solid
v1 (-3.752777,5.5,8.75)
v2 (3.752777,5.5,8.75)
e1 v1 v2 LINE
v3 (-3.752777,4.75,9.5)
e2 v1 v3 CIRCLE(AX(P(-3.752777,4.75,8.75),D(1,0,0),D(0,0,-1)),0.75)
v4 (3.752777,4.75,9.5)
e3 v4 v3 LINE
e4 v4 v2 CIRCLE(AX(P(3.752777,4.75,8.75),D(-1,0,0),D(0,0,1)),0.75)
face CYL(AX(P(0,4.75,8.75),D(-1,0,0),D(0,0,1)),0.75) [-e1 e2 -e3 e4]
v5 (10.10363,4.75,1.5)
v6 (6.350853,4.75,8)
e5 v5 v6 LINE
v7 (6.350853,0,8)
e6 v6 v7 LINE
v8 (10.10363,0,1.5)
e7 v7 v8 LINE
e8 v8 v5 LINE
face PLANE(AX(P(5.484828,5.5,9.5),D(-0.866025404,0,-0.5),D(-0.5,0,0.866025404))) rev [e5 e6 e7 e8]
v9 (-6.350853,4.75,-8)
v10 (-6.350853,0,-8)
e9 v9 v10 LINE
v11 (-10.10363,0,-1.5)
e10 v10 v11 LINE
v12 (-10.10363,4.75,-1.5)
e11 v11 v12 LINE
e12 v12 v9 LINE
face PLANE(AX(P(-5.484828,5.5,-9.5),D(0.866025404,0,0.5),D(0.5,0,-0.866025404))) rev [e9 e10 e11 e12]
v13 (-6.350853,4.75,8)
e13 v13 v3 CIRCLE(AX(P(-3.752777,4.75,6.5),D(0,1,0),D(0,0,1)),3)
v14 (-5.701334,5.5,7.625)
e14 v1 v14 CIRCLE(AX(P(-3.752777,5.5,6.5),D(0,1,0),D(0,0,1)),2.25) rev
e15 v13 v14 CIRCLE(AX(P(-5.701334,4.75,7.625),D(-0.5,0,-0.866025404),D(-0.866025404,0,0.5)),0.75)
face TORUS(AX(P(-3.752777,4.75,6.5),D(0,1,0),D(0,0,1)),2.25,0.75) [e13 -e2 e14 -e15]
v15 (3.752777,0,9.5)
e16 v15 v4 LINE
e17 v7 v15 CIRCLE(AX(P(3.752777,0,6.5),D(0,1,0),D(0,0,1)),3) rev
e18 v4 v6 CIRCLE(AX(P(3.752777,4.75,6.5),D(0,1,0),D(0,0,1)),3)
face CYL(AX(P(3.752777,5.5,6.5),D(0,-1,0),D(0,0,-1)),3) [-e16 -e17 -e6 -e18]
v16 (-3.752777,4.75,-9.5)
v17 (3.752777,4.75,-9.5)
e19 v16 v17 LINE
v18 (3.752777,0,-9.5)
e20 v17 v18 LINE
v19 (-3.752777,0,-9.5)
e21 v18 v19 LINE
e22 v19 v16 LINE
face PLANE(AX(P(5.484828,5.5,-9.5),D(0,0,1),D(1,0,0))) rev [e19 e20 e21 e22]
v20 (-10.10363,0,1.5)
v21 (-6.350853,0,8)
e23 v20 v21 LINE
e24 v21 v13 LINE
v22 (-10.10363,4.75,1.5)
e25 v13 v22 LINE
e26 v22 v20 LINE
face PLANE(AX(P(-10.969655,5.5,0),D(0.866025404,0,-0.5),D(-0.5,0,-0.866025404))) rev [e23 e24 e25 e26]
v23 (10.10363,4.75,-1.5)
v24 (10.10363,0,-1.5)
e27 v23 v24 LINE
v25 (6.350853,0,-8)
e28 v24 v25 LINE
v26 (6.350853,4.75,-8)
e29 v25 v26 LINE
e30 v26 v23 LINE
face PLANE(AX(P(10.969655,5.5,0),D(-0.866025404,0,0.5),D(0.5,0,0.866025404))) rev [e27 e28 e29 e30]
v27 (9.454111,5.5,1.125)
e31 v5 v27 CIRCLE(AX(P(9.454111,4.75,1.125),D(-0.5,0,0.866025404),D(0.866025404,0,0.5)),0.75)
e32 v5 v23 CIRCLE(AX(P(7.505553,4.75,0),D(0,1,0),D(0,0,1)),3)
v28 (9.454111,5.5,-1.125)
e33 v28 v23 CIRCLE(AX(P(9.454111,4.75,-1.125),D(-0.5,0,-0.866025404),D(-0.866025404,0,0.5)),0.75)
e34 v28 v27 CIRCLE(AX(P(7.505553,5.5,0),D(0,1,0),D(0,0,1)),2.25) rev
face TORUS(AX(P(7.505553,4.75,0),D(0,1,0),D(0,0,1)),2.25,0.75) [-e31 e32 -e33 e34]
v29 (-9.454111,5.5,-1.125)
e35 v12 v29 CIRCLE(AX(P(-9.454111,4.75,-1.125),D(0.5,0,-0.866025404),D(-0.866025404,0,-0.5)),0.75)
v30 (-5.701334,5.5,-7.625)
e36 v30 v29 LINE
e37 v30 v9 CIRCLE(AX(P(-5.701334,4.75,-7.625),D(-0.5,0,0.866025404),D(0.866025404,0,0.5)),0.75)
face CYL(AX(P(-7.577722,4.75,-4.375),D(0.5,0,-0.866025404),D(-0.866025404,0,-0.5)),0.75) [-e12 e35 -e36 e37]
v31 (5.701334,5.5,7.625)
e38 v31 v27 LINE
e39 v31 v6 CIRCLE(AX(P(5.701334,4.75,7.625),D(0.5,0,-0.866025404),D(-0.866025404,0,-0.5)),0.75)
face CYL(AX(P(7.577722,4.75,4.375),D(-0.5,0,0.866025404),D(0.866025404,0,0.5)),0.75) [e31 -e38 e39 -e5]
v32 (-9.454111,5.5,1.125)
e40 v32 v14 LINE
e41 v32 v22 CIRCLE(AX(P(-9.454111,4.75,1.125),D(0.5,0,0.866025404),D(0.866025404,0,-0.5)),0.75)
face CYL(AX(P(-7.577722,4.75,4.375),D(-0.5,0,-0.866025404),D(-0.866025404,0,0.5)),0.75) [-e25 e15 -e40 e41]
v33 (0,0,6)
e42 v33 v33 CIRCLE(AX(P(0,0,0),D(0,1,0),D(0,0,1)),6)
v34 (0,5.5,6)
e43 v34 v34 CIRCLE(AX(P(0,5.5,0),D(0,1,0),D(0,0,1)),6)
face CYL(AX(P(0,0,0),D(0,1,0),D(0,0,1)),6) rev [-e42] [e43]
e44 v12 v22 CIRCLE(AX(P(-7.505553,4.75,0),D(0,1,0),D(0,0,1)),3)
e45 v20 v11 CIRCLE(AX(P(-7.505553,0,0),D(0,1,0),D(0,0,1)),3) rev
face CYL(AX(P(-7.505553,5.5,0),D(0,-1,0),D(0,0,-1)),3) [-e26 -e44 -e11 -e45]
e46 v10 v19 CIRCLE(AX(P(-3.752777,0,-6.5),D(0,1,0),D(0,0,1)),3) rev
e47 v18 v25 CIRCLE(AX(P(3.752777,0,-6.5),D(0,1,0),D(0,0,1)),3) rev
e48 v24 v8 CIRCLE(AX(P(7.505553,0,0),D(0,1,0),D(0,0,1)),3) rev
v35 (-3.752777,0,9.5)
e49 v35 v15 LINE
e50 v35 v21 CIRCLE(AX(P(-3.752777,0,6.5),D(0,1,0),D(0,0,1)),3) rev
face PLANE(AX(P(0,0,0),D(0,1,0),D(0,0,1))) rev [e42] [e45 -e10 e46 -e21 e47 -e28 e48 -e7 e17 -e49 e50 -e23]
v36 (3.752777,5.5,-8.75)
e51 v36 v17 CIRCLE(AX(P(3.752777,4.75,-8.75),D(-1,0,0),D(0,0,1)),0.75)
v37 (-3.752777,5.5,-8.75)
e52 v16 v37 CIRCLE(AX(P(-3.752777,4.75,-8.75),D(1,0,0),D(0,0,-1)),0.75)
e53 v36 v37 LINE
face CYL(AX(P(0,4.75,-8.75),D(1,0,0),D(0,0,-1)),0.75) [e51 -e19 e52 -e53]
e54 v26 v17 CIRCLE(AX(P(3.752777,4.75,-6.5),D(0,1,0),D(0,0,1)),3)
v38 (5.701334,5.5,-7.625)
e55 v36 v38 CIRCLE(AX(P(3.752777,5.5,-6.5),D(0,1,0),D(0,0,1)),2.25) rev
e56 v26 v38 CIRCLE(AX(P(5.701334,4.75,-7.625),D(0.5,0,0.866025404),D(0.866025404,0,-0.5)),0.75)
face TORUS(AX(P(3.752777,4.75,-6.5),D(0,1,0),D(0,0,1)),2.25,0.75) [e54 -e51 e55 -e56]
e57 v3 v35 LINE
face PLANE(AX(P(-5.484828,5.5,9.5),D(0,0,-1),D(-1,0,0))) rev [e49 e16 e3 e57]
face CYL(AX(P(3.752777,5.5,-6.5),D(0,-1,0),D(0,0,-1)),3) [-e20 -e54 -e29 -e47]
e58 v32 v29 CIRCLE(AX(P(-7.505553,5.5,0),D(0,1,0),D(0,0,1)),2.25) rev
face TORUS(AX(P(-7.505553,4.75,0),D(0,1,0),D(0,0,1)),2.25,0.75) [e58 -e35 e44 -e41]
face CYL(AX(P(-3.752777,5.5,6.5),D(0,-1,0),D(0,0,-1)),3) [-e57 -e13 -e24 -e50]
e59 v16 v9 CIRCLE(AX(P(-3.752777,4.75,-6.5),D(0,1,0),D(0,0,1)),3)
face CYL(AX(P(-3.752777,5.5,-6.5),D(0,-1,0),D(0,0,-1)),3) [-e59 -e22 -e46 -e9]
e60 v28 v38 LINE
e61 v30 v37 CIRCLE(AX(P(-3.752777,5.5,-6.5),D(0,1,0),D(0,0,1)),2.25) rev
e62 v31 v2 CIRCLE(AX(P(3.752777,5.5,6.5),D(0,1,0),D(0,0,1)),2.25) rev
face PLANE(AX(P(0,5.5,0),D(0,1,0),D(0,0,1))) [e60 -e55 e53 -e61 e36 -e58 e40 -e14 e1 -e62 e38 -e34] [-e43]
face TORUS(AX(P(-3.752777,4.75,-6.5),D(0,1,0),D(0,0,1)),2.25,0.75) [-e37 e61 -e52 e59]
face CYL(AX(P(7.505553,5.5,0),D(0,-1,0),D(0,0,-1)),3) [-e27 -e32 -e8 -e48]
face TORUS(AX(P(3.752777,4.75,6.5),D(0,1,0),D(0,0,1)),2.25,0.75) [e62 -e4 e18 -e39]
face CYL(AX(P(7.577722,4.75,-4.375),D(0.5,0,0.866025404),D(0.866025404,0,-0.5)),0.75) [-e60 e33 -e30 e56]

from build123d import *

# Parameters (mm, degrees)
BOSS_EXTRUDE1_DEPTH = 5.5
FILLET1_R           = 0.75
FILLET2_R           = 3
SKETCH2_R           = 6
CUT_EXTRUDE1_DEPTH  = 16.19429676984497


with BuildPart() as part:
    # Sketch1 → Boss-Extrude1 (new body)
    with BuildSketch(Plane(origin=(0, 0, 0), x_dir=(1, 0, 0), z_dir=(0, 1, 0))):
        Polygon((10.969655114602853, 0), (5.484827557301405, 9.499999999999982), (-5.48482755730147, 9.499999999999945), (-10.969655114602851, -7.66e-14), (-5.484827557301339, -9.50000000000002), (5.4848275573015375, -9.499999999999904), align=None)
    extrude(amount=BOSS_EXTRUDE1_DEPTH)

    # Fillet1
    fillet1_edges = [part.edges().sort_by_distance(p)[0] for p in [
        (-3.286e-14, 5.5, -9.499999999999964),
        (-8.227241335952161, 5.5, -4.749999999999934),
        (-8.227241335952096, 5.5, 4.750000000000048),
        (9.859e-14, 5.5, 9.499999999999961),
        (8.227241335952195, 5.5, 4.749999999999952),
        (8.22724133595213, 5.5, -4.749999999999991),
    ]]
    fillet(fillet1_edges, radius=FILLET1_R)

    # Fillet2
    # the kernel refuses this fillet: 3 mm, written as the material it takes off along each edge
    with BuildSketch(Plane(origin=(3.752776749732533, 5.5, -6.499999999999977), x_dir=(0.8660254037844382, 0, -0.500000000000001), z_dir=(0.500000000000001, 0, 0.8660254037844382))) as fillet2_piece_1:
        with BuildLine():
            CenterArc((2.25, -0.75), 0.75, 0, 90)
            Line((3, -0.75), (3, 0))
            Line((3, 0), (2.25, 0))
        make_face()
    revolve(axis=Axis((3.752776749732533, 5.5, -6.499999999999977), (0, 1, 0)), revolution_arc=60.000000000000135, mode=Mode.SUBTRACT)
    with BuildSketch(Plane(origin=(7.505553499465103, 5.5, 1.221e-14), x_dir=(0.8660254037844416, 0, 0.49999999999999495), z_dir=(-0.49999999999999495, 0, 0.8660254037844416))) as fillet2_piece_2:
        with BuildLine():
            CenterArc((2.25, -0.75), 0.75, 0, 90)
            Line((3, -0.75), (3, 0))
            Line((3, 0), (2.25, 0))
        make_face()
    revolve(axis=Axis((7.505553499465103, 5.5, 1.221e-14), (0, 1, 0)), revolution_arc=59.99999999999973, mode=Mode.SUBTRACT)
    with BuildSketch(Plane(origin=(-3.752776749732577, 5.5, -6.49999999999995), x_dir=(-3.4e-15, 0, -1), z_dir=(1, 0, -3.4e-15))) as fillet2_piece_3:
        with BuildLine():
            CenterArc((2.25, -0.75), 0.75, 0, 90)
            Line((3, -0.75), (3, 0))
            Line((3, 0), (2.25, 0))
        make_face()
    revolve(axis=Axis((-3.752776749732577, 5.5, -6.49999999999995), (0, 1, 0)), revolution_arc=60.00000000000015, mode=Mode.SUBTRACT)
    with BuildSketch(Plane(origin=(3.7527767497326376, 5.5, 6.499999999999923), x_dir=(1.053e-14, 0, 1), z_dir=(-1, 0, 1.053e-14))) as fillet2_piece_4:
        with BuildLine():
            CenterArc((2.25, -0.75), 0.75, 0, 90)
            Line((3, -0.75), (3, 0))
            Line((3, 0), (2.25, 0))
        make_face()
    revolve(axis=Axis((3.7527767497326376, 5.5, 6.499999999999923), (0, 1, 0)), revolution_arc=59.99999999999973, mode=Mode.SUBTRACT)
    with BuildSketch(Plane(origin=(-7.505553499465096, 5.5, 5.373e-14), x_dir=(-0.8660254037844417, 0, -0.49999999999999484), z_dir=(0.49999999999999484, 0, -0.8660254037844417))) as fillet2_piece_5:
        with BuildLine():
            CenterArc((2.25, -0.75), 0.75, 0, 90)
            Line((3, -0.75), (3, 0))
            Line((3, 0), (2.25, 0))
        make_face()
    revolve(axis=Axis((-7.505553499465096, 5.5, 5.373e-14), (0, 1, 0)), revolution_arc=60.00000000000011, mode=Mode.SUBTRACT)
    with BuildSketch(Plane(origin=(-3.752776749732488, 5.5, 6.500000000000002), x_dir=(-0.8660254037844347, 0, 0.5000000000000068), z_dir=(-0.5000000000000068, 0, -0.8660254037844347))) as fillet2_piece_6:
        with BuildLine():
            CenterArc((2.25, -0.75), 0.75, 0, 90)
            Line((3, -0.75), (3, 0))
            Line((3, 0), (2.25, 0))
        make_face()
    revolve(axis=Axis((-3.752776749732488, 5.5, 6.500000000000002), (0, 1, 0)), revolution_arc=60.00000000000016, mode=Mode.SUBTRACT)
    with BuildSketch(Plane(origin=(-5.484827557301339, -4.330127018922208, 9.50000000000002), x_dir=(1, 0, -1.026e-14), z_dir=(0, 1, 0))) as fillet2_piece_7:
        with BuildLine():
            CenterArc((FILLET2_R * 0.57735026919, FILLET2_R), FILLET2_R, 209.99999999999983, 60.00000000000017)
            Line((-FILLET2_R * 0.288675134595, FILLET2_R * 0.5), (0, 0))
            Line((0, 0), (FILLET2_R * 0.57735026919, 0))
        make_face()
    extrude(amount=9.830127018922209, mode=Mode.SUBTRACT)
    with BuildSketch(Plane(origin=(-10.969655114602851, -4.3301270189222, 7.638e-14), x_dir=(0.4999999999999946, 0, -0.8660254037844417), z_dir=(0, 1, 0))) as fillet2_piece_8:
        with BuildLine():
            CenterArc((FILLET2_R * 0.57735026919, -FILLET2_R), FILLET2_R, 89.99999999999999, 60.00000000000007)
            Line((-FILLET2_R * 0.288675134595, -FILLET2_R * 0.5), (0, 0))
            Line((0, 0), (FILLET2_R * 0.57735026919, 3e-17))
        make_face()
    extrude(amount=9.8301270189222, mode=Mode.SUBTRACT)
    with BuildSketch(Plane(origin=(-5.484827557301471, -4.330127018922209, -9.499999999999945), x_dir=(1, 0, -3.08e-15), z_dir=(0, 1, 0))) as fillet2_piece_9:
        with BuildLine():
            CenterArc((FILLET2_R * 0.57735026919, -FILLET2_R), FILLET2_R, 90.00000000000003, 60.00000000000017)
            Line((-FILLET2_R * 0.288675134595, -FILLET2_R * 0.5), (0, 0))
            Line((0, 0), (FILLET2_R * 0.57735026919, 0))
        make_face()
    extrude(amount=9.830127018922209, mode=Mode.SUBTRACT)
    with BuildSketch(Plane(origin=(5.484827557301404, -4.330127018922204, -9.499999999999982), x_dir=(0.5000000000000011, 0, 0.866025403784438), z_dir=(0, 1, 0))) as fillet2_piece_10:
        with BuildLine():
            CenterArc((FILLET2_R * 0.57735026919, -FILLET2_R), FILLET2_R, 90, 60.00000000000014)
            Line((-FILLET2_R * 0.288675134595, -FILLET2_R * 0.5), (0, 0))
            Line((0, 0), (FILLET2_R * 0.57735026919, 1.1e-16))
        make_face()
    extrude(amount=9.830127018922205, mode=Mode.SUBTRACT)
    with BuildSketch(Plane(origin=(10.969655114602853, -4.330127018922171, 0), x_dir=(-0.500000000000001, 0, -0.8660254037844382), z_dir=(0, 1, 0))) as fillet2_piece_11:
        with BuildLine():
            CenterArc((FILLET2_R * 0.57735026919, FILLET2_R), FILLET2_R, 210.00000000000028, 59.999999999999716)
            Line((-FILLET2_R * 0.288675134595, FILLET2_R * 0.5), (0, 0))
            Line((0, 0), (FILLET2_R * 0.57735026919, 6e-17))
        make_face()
    extrude(amount=9.83012701892217, mode=Mode.SUBTRACT)
    with BuildSketch(Plane(origin=(5.4848275573015375, -4.330127018922169, 9.499999999999904), x_dir=(0.499999999999995, 0, -0.8660254037844415), z_dir=(0, 1, 0))) as fillet2_piece_12:
        with BuildLine():
            CenterArc((FILLET2_R * 0.57735026919, FILLET2_R), FILLET2_R, 210.00000000000028, 59.999999999999716)
            Line((-FILLET2_R * 0.288675134595, FILLET2_R * 0.5), (0, 0))
            Line((0, 0), (FILLET2_R * 0.57735026919, 6e-17))
        make_face()
    extrude(amount=9.83012701892217, mode=Mode.SUBTRACT)

    # Sketch2 → Cut-Extrude1 (cut, through all)
    with BuildSketch(Plane(origin=(0, 5.5, 0), x_dir=(1, 0, 0), z_dir=(0, 1, 0))):
        with Locations(Location((0, 0, 0), (0, 0, 270))):
            Circle(SKETCH2_R)
    extrude(amount=-CUT_EXTRUDE1_DEPTH, mode=Mode.SUBTRACT)


solid = part.part
